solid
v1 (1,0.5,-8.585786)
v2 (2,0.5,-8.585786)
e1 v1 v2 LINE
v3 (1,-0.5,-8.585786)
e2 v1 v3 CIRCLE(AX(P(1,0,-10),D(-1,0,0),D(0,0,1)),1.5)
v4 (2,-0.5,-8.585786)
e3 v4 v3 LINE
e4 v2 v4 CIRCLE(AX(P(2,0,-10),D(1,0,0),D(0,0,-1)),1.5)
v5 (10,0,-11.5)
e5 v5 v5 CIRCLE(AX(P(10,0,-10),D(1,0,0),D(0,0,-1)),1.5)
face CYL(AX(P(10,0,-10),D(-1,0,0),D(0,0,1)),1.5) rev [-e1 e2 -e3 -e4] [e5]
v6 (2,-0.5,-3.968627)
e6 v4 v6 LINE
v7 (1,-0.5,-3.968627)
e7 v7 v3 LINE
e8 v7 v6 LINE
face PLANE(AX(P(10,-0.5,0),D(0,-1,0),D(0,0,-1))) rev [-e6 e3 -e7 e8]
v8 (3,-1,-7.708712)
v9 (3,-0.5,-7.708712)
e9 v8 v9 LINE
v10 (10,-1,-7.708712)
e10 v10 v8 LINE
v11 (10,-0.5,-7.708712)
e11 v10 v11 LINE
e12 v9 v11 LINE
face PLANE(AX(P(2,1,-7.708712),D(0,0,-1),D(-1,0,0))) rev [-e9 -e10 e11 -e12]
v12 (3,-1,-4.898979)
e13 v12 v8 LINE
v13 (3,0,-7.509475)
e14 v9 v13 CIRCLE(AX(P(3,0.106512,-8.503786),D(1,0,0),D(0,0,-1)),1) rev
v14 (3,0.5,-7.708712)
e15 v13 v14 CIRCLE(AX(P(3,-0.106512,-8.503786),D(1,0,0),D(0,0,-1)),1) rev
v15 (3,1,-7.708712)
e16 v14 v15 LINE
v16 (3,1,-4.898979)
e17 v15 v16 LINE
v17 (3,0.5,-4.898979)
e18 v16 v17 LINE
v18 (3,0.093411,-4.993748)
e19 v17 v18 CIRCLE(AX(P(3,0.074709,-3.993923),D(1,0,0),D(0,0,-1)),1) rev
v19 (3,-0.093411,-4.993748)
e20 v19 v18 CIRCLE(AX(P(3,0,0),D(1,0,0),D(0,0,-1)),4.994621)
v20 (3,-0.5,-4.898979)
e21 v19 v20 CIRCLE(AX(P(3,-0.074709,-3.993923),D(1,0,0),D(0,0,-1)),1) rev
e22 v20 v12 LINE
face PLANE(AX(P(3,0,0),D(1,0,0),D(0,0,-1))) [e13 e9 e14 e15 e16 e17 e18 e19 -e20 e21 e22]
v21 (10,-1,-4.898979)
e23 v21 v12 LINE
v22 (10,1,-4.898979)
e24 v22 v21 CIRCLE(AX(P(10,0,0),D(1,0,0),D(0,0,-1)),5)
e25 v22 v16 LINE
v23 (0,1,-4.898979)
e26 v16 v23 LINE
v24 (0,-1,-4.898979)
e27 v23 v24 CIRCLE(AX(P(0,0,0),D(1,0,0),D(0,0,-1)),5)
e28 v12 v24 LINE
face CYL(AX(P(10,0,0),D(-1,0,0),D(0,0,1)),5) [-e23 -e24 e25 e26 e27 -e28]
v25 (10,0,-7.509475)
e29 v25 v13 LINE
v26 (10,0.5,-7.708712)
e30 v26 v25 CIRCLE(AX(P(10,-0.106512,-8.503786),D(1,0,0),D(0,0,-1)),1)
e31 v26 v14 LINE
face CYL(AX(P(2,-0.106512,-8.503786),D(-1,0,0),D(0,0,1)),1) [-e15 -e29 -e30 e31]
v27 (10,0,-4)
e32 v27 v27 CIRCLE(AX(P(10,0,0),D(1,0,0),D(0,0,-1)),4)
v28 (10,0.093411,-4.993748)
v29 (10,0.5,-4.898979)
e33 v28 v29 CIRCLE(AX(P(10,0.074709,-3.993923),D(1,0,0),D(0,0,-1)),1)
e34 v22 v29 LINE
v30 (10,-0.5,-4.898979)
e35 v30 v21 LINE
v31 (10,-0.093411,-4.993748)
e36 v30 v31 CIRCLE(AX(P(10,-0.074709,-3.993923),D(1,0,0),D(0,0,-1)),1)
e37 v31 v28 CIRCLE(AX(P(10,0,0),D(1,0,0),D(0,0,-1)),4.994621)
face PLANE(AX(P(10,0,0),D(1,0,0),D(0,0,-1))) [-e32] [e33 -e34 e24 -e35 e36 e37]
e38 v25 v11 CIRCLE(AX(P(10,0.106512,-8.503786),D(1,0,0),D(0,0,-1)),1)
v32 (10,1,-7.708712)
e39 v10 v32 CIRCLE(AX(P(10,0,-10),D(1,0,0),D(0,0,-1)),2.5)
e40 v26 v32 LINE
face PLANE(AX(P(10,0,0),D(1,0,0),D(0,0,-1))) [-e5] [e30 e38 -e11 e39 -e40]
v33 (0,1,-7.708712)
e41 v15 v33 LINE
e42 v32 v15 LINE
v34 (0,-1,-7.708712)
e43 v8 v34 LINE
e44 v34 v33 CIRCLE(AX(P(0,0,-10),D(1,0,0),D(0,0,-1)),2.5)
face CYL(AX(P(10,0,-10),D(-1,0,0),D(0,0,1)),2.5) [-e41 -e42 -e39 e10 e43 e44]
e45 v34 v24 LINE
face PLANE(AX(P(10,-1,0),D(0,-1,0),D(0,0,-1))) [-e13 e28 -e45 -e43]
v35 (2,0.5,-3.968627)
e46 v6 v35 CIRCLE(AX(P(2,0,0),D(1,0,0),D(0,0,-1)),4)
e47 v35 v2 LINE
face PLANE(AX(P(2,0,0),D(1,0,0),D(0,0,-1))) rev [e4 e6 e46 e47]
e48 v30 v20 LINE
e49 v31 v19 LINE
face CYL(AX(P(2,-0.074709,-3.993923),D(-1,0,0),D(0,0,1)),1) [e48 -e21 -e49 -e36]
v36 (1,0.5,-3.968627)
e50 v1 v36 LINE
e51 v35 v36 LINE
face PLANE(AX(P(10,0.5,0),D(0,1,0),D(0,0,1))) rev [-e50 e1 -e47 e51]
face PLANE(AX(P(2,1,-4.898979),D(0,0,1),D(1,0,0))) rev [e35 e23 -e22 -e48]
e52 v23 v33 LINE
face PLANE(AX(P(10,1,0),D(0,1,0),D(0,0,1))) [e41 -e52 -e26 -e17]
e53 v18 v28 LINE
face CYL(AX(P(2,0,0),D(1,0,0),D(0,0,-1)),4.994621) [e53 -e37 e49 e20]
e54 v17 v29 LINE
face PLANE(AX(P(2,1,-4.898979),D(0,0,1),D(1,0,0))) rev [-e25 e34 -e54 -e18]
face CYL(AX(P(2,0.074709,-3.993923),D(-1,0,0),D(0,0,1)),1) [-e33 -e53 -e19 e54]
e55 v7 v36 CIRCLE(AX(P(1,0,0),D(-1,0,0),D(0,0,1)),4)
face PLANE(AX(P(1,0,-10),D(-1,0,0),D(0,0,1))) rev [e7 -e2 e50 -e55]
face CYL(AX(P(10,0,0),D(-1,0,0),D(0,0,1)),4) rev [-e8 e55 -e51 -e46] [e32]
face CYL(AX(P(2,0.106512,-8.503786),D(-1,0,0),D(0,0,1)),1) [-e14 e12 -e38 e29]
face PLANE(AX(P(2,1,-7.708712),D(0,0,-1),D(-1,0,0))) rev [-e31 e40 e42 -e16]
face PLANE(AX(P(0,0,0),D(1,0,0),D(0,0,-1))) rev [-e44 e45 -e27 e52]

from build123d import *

# Parameters (mm, degrees)
BOSS_EXTRUDE3_DEPTH = 10
BOSS_EXTRUDE4_DEPTH = 1
CUT_EXTRUDE1_START  = -9
SKETCH3_R           = 4
SKETCH3_R_2         = 1.5
CUT_EXTRUDE1_DEPTH  = 9
SKETCH4_W           = 2.809732667
SKETCH4_H           = 2
CUT_EXTRUDE2_DEPTH  = 8
SKETCH5_W           = 2.809732667
SKETCH5_H           = 2
BOSS_EXTRUDE5_DEPTH = 1
BOSS_EXTRUDE6_START = -8
BOSS_EXTRUDE6_DEPTH = 8
FILLET3_R           = 1


with BuildPart() as part:
    # Sketch1 → Boss-Extrude3 (new body)
    with BuildSketch(Plane(origin=(0, 0, 0), x_dir=(0, 0, -1), z_dir=(1, 0, 0))):
        with BuildLine():
            Line((7.708712153, -1), (4.898979486, -1))
            ThreePointArc((4.898979486, -1), (-5, 0), (4.898979486, 1))
            Line((4.898979486, 1), (7.708712153, 1))
            ThreePointArc((7.708712153, 1), (12.5, 0), (7.708712153, -1))
        make_face()
        with BuildLine():
            ThreePointArc((8.881966011, -1), (11.5, 0), (8.881966011, 1))
            Line((8.881966011, 1), (8.881966011, 0.5))
            Line((8.881966011, 0.5), (3.872983346, 0.5))
            Line((3.872983346, 0.5), (3.872983346, 1))
            ThreePointArc((3.872983346, 1), (-4, 0), (3.872983346, -1))
            Line((3.872983346, -1), (3.872983346, -0.5))
            Line((3.872983346, -0.5), (8.881966011, -0.5))
            Line((8.881966011, -0.5), (8.881966011, -1))
        make_face(mode=Mode.SUBTRACT)
    extrude(amount=BOSS_EXTRUDE3_DEPTH)

    # Sketch2 → Boss-Extrude4 (add)
    with BuildSketch(Plane.ZY):
        with BuildLine():
            Line((-8.585786438, 0.5), (-3.968626967, 0.5))
            ThreePointArc((-3.968626967, 0.5), (4, 0), (-3.968626967, -0.5))
            Line((-3.968626967, -0.5), (-8.585786438, -0.5))
            ThreePointArc((-8.585786438, -0.5), (-11.5, 0), (-8.585786438, 0.5))
        make_face()
    extrude(amount=-BOSS_EXTRUDE4_DEPTH)

    # Sketch3 → Cut-Extrude1 (cut)
    with BuildSketch(Plane(origin=(10, 0, 0), x_dir=(0, 0, -1), z_dir=(1, 0, 0)).offset(CUT_EXTRUDE1_START)):
        Circle(SKETCH3_R)
        with Locations((10, 0)):
            Circle(SKETCH3_R_2)
    extrude(amount=CUT_EXTRUDE1_DEPTH, mode=Mode.SUBTRACT)

    # Sketch4 → Cut-Extrude2 (cut)
    with BuildSketch(Plane(origin=(10, 0, 0), x_dir=(0, 0, -1), z_dir=(1, 0, 0))):
        with Locations((6.30384582, 0)):
            Rectangle(SKETCH4_W, SKETCH4_H)
    extrude(amount=-CUT_EXTRUDE2_DEPTH, mode=Mode.SUBTRACT)

    # Sketch5 → Boss-Extrude5 (add)
    with BuildSketch(Plane(origin=(2, 0, 0), x_dir=(0, 0, -1), z_dir=(1, 0, 0))):
        with Locations((6.30384582, 0)):
            Rectangle(SKETCH5_W, SKETCH5_H)
    extrude(amount=BOSS_EXTRUDE5_DEPTH)

    # Sketch6 → Boss-Extrude6 (add)
    with BuildSketch(Plane(origin=(10, 0, 0), x_dir=(0, 0, -1), z_dir=(1, 0, 0)).offset(BOSS_EXTRUDE6_START)):
        with BuildLine():
            Line((3.968626967, 0.5), (4.969531559, 0.5))
            ThreePointArc((4.969531559, 0.5), (4.994621499, 0), (4.969531559, -0.5))
            Line((4.969531559, -0.5), (3.968626967, -0.5))
            ThreePointArc((3.968626967, -0.5), (4, 0), (3.968626967, 0.5))
        make_face()
        with BuildLine():
            Line((8.585786438, 0.5), (7.550510257, 0.5))
            ThreePointArc((7.550510257, 0.5), (7.5, 0), (7.550510257, -0.5))
            Line((7.550510257, -0.5), (8.585786438, -0.5))
            ThreePointArc((8.585786438, -0.5), (8.5, 0), (8.585786438, 0.5))
        make_face()
    extrude(amount=BOSS_EXTRUDE6_DEPTH)

    # Fillet3
    # the kernel refuses this fillet: 1 mm, written as the material it takes off along each edge
    with BuildSketch(Plane(origin=(3, 0.5, -4.969531559), x_dir=(0, -0.9982310173351231, -0.059454487047532374), z_dir=(1, 0, 0))) as fillet3_piece_1:
        with BuildLine():
            CenterArc((0.366534345, -0.999168363), FILLET3_R, 87.663129738, 24.097452775)
            Line((-0.004194637, -0.070427268), (0, 0))
            ThreePointArc((0, 0), (0.203654559, 0.004153711), (0.407309118, 0))
        make_face()
    extrude(amount=8.018272795, mode=Mode.SUBTRACT)
    with BuildSketch(Plane(origin=(3, -0.5, -4.969531559), x_dir=(0, 0, 1), z_dir=(1, 0, 0))) as fillet3_piece_2:
        with BuildLine():
            CenterArc((0.97560874, -0.425290994), FILLET3_R, 154.830916209, 24.097452775)
            ThreePointArc((-0.024216355, -0.406588595), (-0.016254541, -0.203047341), (0, 0))
            Line((0, 0), (0.070552073, 0))
        make_face()
    extrude(amount=8.018272795, mode=Mode.SUBTRACT)
    with BuildSketch(Plane(origin=(3, -0.5, -7.550510257), x_dir=(0, 8.127970304186451e-12, -1.0), z_dir=(1, 0, 0))) as fillet3_piece_3:
        with BuildLine():
            CenterArc((0.953276133, 0.606512125), FILLET3_R, 175.928109784, 41.40962211)
            ThreePointArc((-0.044199608, 0.677520208), (-0.045207292, 0.337252633), (0, 0))
            Line((0, 0), (0.158201895, 0))
        make_face()
    extrude(amount=8.697401022, mode=Mode.SUBTRACT)
    with BuildSketch(Plane(origin=(3, 0.5, -7.550510257), x_dir=(0, -0.9978788138478943, 0.06509894679270496), z_dir=(1, 0, 0))) as fillet3_piece_4:
        with BuildLine():
            CenterArc((0.543168327, 0.990737357), FILLET3_R, 236.394802514, 41.40962211)
            Line((-0.010298777, 0.15786632), (0, 0))
            ThreePointArc((0, 0), (0.339480204, -0.023156608), (0.678960409, 0))
        make_face()
    extrude(amount=8.697401022, mode=Mode.SUBTRACT)


solid = part.part
